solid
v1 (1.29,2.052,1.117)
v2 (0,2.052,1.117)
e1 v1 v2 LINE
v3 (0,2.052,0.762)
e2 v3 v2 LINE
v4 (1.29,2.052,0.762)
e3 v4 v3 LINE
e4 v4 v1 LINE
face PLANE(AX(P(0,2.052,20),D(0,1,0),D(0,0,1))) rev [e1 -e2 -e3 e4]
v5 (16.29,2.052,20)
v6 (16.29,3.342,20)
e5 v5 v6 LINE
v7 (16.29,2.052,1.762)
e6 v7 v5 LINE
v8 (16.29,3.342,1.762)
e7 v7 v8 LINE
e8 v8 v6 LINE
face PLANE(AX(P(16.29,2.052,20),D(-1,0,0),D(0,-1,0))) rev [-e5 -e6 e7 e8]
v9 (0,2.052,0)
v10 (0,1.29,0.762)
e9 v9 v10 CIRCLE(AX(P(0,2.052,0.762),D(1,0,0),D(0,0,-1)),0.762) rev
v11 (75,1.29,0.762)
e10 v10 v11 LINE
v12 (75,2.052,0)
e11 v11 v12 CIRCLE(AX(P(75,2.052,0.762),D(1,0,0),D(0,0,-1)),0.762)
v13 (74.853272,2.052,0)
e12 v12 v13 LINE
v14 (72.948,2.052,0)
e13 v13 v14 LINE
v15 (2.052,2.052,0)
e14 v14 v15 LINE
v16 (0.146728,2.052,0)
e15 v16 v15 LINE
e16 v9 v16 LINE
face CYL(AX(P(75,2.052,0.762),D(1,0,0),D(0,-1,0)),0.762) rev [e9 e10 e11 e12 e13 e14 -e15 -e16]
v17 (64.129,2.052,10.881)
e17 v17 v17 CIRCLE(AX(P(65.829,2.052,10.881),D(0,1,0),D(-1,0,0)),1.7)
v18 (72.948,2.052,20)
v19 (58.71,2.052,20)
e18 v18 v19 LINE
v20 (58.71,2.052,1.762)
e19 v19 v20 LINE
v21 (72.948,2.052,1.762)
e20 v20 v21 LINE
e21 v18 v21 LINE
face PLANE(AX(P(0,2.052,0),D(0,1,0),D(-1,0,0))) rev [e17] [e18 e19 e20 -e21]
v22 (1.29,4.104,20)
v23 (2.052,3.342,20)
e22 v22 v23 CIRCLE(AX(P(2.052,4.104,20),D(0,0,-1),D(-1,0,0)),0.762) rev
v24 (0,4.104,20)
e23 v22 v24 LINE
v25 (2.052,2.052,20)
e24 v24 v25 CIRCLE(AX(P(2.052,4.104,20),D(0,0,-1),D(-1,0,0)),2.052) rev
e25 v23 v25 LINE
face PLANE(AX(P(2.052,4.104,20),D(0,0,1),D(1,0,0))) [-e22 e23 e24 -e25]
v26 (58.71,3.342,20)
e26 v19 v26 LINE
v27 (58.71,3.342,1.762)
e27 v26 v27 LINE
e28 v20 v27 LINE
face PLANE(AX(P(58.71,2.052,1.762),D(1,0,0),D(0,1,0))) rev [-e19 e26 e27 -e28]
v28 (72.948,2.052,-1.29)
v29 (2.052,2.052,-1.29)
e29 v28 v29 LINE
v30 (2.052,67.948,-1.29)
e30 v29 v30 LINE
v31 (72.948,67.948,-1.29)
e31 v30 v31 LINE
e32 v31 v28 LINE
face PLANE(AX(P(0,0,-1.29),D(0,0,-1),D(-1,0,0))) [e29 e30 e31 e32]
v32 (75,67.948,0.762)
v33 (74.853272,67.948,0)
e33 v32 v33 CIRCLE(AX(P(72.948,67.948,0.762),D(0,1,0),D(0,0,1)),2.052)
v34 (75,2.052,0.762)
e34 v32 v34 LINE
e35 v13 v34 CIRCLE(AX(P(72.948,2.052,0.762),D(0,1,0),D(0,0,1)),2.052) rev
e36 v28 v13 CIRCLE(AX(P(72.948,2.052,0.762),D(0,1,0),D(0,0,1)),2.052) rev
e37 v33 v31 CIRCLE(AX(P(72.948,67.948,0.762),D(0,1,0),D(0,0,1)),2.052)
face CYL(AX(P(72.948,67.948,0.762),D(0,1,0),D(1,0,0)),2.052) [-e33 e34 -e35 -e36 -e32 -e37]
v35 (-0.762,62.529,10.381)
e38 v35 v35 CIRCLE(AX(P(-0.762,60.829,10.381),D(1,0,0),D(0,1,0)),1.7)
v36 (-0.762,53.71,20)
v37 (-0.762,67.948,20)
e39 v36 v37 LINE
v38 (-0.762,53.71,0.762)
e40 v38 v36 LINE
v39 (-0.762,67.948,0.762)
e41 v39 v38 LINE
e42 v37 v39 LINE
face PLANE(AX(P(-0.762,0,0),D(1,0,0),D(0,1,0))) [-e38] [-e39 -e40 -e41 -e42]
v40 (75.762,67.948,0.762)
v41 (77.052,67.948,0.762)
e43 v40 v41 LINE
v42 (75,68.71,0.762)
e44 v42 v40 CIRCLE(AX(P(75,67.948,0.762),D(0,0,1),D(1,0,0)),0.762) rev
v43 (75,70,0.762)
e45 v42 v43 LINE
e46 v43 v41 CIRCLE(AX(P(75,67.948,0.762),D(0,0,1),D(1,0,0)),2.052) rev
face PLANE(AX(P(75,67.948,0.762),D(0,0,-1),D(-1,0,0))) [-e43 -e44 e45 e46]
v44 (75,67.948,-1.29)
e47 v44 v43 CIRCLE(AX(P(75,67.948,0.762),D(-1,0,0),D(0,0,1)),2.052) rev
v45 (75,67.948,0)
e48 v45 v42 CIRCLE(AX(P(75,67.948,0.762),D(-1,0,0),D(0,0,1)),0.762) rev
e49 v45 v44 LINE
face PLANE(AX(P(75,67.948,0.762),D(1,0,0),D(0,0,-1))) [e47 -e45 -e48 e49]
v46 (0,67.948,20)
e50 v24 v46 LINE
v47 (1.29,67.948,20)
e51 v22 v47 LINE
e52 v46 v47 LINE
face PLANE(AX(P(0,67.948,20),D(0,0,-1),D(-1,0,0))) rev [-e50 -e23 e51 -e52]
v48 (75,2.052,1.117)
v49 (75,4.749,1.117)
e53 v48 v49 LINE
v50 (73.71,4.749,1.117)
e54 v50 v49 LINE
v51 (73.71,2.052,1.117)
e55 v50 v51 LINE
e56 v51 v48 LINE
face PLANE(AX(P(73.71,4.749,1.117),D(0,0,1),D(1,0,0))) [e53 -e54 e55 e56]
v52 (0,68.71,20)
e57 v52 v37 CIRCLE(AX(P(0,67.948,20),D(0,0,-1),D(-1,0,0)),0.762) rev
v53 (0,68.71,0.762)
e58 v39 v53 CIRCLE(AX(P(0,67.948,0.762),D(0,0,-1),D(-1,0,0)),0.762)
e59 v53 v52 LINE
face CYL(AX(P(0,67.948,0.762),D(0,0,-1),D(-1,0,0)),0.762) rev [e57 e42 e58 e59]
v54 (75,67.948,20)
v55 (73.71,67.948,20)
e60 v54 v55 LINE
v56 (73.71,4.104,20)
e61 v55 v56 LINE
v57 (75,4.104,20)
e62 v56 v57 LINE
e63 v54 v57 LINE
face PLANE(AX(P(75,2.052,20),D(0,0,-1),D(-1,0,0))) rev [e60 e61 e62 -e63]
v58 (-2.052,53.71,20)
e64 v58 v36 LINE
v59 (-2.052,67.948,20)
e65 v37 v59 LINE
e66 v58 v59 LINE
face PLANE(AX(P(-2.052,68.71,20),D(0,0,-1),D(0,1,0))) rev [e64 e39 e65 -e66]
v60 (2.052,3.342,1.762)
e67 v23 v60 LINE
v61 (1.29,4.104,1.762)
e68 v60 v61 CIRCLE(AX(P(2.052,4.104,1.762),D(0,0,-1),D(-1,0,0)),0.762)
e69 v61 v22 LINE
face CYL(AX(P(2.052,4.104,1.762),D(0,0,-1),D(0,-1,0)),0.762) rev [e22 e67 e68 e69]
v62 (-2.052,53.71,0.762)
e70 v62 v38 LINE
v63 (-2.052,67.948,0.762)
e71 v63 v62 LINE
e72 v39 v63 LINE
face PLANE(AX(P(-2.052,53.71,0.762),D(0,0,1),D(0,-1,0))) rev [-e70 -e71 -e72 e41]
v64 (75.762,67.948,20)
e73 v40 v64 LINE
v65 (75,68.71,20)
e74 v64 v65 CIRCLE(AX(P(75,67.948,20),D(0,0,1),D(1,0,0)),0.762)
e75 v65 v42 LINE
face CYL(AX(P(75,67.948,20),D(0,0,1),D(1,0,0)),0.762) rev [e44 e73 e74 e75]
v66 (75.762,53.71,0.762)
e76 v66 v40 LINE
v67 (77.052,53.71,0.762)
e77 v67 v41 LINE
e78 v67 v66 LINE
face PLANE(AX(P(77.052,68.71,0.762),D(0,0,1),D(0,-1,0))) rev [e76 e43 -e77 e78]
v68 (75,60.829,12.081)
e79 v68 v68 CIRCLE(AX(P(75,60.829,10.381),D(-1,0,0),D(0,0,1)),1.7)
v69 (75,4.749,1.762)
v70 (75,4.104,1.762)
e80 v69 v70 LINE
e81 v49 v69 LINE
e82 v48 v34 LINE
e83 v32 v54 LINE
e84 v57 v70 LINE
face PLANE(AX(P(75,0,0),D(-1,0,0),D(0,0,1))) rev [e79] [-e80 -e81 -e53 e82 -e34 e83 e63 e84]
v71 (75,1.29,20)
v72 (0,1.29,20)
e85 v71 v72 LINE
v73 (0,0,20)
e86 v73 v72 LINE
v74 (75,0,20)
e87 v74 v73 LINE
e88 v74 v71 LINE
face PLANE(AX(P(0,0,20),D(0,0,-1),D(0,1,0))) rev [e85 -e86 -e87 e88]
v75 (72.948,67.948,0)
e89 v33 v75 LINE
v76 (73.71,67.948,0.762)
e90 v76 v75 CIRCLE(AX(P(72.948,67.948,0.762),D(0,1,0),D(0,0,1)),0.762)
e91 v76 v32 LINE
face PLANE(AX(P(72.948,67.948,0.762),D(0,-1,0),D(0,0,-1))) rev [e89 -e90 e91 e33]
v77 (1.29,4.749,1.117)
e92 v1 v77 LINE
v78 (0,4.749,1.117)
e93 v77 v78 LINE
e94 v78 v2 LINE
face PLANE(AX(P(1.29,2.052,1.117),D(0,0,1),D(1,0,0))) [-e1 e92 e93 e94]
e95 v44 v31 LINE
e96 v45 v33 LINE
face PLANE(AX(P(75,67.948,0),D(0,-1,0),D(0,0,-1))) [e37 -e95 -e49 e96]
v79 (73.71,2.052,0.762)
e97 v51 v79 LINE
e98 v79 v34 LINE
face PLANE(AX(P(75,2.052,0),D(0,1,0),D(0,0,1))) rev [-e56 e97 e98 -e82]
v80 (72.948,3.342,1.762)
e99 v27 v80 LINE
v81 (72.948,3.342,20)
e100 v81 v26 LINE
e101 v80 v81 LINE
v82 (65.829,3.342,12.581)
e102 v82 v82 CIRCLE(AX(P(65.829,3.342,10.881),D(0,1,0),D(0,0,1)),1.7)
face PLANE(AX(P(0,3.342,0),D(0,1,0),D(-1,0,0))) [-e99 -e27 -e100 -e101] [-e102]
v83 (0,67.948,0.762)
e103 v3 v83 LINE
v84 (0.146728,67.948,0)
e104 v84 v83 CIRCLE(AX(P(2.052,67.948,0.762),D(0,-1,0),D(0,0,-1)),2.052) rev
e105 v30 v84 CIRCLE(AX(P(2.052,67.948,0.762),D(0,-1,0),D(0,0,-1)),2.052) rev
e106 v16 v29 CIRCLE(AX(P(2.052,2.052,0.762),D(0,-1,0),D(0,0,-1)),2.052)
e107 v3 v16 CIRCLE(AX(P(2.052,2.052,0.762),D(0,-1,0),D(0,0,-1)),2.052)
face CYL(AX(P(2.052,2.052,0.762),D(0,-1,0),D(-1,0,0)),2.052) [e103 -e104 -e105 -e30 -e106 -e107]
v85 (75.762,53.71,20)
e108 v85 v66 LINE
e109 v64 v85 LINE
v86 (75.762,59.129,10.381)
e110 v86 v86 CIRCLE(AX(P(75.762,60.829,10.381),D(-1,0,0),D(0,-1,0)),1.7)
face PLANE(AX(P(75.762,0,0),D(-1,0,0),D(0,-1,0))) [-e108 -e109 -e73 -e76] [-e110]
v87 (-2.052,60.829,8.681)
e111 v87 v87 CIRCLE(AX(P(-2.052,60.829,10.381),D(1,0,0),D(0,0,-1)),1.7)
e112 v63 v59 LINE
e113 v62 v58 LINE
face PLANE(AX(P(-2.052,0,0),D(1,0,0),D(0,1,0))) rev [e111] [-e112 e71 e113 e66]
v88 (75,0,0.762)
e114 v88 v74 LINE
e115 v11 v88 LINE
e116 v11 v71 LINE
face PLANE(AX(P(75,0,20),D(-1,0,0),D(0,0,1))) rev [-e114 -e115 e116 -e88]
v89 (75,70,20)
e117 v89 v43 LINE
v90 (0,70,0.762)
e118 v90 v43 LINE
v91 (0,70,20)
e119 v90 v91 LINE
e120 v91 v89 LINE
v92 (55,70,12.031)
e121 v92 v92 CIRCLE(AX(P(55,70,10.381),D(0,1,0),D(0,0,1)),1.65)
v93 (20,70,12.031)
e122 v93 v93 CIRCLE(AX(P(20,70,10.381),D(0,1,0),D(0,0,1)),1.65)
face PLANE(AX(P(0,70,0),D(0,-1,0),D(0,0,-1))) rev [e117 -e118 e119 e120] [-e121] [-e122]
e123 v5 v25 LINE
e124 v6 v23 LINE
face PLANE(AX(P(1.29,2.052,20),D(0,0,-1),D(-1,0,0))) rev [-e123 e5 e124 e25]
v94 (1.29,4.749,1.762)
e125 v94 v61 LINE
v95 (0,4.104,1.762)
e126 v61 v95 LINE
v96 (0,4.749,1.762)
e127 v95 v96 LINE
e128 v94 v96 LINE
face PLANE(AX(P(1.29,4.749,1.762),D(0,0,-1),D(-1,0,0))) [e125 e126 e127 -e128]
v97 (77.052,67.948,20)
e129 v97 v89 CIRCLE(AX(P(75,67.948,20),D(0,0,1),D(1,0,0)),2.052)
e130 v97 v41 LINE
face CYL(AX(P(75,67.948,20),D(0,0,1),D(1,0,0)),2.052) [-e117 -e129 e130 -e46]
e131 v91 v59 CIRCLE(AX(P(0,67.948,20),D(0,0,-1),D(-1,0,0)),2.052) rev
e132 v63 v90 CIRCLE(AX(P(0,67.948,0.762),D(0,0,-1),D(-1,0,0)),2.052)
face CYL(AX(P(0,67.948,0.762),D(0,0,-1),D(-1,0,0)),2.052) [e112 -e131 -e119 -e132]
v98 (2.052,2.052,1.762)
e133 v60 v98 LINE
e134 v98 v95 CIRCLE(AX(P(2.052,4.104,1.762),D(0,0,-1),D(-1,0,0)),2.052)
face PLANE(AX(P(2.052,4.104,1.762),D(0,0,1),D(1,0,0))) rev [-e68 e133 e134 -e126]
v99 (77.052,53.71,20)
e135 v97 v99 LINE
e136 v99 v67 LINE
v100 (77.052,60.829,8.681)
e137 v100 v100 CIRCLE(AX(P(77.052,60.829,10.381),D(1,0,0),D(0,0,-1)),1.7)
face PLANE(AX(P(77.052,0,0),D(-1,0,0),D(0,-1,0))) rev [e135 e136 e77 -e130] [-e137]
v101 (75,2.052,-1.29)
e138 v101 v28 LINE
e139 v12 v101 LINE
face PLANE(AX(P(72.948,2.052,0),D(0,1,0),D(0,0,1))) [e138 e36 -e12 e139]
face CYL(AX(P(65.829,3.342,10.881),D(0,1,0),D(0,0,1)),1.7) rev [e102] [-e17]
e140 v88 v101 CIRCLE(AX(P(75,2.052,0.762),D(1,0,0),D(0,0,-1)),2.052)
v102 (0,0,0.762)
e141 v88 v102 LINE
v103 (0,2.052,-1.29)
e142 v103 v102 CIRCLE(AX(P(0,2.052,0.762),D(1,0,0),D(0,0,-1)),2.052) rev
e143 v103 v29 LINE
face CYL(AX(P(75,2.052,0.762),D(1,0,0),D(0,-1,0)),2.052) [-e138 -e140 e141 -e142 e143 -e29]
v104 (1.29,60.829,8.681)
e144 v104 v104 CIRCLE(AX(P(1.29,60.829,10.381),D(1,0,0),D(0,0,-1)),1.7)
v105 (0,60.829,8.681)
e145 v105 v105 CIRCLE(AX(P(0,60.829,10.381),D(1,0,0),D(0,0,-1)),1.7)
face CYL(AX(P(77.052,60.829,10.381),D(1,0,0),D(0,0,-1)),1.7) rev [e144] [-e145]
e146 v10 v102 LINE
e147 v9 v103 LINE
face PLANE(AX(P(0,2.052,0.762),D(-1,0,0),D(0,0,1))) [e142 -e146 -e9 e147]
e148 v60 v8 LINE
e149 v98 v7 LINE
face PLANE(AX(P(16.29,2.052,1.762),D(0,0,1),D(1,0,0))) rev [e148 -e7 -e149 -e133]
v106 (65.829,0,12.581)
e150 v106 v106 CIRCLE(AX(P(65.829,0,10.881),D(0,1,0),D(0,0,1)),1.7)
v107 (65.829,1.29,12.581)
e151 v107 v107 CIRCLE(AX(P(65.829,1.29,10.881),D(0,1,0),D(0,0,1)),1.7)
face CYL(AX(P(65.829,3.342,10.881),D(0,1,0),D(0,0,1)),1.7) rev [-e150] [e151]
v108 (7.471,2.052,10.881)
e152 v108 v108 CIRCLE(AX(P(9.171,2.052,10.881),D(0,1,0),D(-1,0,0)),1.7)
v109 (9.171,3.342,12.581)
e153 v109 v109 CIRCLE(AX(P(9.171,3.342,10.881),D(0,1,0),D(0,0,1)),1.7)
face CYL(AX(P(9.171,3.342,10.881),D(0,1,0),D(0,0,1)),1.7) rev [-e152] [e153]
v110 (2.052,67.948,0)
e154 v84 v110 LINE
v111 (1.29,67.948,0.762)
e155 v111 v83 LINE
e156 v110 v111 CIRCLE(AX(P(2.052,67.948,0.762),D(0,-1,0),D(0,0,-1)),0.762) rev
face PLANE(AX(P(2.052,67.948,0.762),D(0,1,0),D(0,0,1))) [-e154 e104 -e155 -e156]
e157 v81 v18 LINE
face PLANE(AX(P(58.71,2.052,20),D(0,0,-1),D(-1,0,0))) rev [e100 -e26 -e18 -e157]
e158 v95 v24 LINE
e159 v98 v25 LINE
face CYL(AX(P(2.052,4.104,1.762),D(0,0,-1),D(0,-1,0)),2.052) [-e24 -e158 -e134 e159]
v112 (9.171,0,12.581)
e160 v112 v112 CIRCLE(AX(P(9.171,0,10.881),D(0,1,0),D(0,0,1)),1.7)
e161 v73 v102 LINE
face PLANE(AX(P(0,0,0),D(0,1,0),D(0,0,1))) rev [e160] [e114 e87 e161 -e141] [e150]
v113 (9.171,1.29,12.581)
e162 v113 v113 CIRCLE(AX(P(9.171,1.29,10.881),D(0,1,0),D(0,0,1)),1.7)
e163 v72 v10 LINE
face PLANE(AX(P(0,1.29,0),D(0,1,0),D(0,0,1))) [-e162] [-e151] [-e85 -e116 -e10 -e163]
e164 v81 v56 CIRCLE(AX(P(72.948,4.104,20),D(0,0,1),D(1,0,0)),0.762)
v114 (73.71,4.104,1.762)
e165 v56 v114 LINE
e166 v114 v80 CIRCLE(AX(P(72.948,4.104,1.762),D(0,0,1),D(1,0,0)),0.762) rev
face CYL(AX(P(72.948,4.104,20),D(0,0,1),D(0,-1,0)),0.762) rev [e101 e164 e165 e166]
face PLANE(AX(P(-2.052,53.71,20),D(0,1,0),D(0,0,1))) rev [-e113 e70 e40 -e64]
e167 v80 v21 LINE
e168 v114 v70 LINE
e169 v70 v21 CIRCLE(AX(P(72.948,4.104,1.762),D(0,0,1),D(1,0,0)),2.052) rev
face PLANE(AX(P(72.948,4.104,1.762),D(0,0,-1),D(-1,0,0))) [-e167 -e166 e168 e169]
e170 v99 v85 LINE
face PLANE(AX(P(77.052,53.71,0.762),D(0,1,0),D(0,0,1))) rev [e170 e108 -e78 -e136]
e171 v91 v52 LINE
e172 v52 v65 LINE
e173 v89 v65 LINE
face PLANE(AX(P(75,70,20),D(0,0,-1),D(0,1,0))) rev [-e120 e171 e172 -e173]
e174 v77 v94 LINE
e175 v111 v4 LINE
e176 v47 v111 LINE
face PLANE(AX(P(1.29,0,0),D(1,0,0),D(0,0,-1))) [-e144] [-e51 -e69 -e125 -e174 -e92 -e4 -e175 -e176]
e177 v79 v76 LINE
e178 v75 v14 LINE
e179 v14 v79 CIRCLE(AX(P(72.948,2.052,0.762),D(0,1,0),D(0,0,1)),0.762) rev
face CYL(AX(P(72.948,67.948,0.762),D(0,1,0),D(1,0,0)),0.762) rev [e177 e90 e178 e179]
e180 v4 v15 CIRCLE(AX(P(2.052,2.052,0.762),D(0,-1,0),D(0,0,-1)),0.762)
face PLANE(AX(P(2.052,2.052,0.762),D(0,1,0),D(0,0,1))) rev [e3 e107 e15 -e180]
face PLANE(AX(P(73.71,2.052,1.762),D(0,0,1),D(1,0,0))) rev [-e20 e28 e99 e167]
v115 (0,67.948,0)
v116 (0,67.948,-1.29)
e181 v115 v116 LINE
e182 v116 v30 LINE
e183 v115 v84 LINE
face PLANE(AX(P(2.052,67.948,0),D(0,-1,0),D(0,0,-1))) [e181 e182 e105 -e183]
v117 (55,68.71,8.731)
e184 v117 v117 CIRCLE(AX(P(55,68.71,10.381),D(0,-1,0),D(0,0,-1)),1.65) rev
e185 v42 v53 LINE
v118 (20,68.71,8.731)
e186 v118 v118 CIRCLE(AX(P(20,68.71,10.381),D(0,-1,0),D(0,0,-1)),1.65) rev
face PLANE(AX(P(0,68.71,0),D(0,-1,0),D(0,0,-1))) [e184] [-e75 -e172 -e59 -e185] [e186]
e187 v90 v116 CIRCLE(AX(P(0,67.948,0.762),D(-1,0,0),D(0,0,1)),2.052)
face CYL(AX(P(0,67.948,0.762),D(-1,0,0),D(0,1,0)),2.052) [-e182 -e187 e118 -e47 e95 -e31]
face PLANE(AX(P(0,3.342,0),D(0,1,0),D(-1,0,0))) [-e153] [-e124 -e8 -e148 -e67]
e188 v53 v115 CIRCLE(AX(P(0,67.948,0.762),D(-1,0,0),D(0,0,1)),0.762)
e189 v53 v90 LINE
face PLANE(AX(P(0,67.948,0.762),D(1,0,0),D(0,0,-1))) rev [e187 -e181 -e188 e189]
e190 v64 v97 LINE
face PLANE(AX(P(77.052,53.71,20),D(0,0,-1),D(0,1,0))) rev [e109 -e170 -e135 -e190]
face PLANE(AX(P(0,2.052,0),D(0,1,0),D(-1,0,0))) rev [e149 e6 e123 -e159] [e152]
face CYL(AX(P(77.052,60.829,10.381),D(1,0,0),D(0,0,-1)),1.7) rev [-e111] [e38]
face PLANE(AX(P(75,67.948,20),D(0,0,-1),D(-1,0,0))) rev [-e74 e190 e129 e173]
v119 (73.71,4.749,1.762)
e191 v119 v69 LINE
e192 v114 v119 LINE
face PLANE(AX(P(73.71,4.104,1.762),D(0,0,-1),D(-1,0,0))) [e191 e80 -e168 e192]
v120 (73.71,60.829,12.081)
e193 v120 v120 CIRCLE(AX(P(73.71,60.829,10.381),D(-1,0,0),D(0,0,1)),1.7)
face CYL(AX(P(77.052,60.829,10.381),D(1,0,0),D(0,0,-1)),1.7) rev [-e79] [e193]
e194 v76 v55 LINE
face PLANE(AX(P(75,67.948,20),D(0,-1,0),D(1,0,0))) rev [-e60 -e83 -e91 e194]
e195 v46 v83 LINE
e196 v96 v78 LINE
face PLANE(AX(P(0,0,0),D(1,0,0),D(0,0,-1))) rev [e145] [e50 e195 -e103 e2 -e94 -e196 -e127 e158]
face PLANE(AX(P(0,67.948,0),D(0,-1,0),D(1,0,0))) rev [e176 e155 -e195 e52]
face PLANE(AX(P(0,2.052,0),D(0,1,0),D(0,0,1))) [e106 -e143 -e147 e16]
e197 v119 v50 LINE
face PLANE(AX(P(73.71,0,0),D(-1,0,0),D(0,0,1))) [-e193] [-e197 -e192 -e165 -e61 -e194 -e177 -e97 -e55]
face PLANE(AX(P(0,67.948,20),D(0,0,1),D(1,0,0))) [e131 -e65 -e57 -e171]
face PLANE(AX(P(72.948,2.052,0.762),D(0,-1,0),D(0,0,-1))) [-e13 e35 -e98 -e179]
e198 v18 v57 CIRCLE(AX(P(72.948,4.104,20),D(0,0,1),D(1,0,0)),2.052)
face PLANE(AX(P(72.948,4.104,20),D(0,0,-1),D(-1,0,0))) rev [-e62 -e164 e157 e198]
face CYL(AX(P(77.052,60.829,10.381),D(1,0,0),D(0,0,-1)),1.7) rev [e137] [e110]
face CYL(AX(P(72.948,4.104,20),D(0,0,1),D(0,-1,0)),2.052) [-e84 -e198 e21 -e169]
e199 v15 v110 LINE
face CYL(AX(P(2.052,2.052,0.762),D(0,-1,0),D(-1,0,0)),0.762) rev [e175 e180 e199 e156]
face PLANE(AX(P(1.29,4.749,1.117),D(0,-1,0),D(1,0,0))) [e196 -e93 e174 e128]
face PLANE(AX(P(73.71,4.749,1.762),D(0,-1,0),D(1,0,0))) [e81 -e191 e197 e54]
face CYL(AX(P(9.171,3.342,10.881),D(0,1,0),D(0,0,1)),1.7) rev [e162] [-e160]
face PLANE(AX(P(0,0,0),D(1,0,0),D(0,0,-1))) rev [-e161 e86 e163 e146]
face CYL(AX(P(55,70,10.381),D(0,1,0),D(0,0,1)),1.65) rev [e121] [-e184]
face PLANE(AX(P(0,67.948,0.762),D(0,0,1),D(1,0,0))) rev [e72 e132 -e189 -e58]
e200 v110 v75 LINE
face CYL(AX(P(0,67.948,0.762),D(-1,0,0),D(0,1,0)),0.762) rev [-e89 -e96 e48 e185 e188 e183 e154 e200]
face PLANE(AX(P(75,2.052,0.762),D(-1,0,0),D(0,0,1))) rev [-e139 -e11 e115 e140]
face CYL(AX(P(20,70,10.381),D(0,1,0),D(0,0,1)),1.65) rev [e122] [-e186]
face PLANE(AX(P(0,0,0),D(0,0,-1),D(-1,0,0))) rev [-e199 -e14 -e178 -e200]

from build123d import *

# Parameters (mm, degrees)
SKETCH1_W                        = 75
SKETCH1_H                        = 70
BASE_FLANGE1_DEPTH               = 1.29
EDGE_FLANGE1_STRIP_W             = 6.684
EDGE_FLANGE1_STRIP_H             = 1.29
EDGE_FLANGE1_STRIP_CUT_DEPTH     = 75
EDGE_FLANGE1_DEPTH               = 75
EDGE_FLANGE2_STRIP_W             = 6.684
EDGE_FLANGE2_STRIP_H             = 1.29
EDGE_FLANGE2_STRIP_CUT_DEPTH     = 75
EDGE_FLANGE2_DEPTH               = 75
EDGE_FLANGE3_STRIP_W             = 6.684
EDGE_FLANGE3_STRIP_H             = 1.29
EDGE_FLANGE3_STRIP_CUT_DEPTH     = 65.896
EDGE_FLANGE3_DEPTH               = 65.896
EDGE_FLANGE4_STRIP_W             = 6.684
EDGE_FLANGE4_STRIP_H             = 1.29
EDGE_FLANGE4_STRIP_CUT_DEPTH     = 65.896
EDGE_FLANGE4_DEPTH               = 65.896
EDGE_FLANGE6_START               = 1.117
EDGE_FLANGE6_DEPTH               = 18.883
EDGE_FLANGE6_2_DEPTH             = 0.645
EDGE_FLANGE6_START_2             = 1.762
EDGE_FLANGE6_3_DEPTH             = 18.238
EDGE_FLANGE8_START               = 1.117
EDGE_FLANGE8_DEPTH               = 18.883
EDGE_FLANGE8_2_DEPTH             = 0.645
EDGE_FLANGE8_START_2             = 1.762
EDGE_FLANGE8_3_DEPTH             = 18.238
EDGE_FLANGE9_DEPTH               = 19.238
EDGE_FLANGE10_DEPTH              = 19.238
TAP_DRILL_FOR_M4X0_7_TAP1_REACH  = 108.005
TAP_DRILL_FOR_M4X0_7_TAP1_BORE_R = 1.65
M3_CLEARANCE_HOLE1_D             = 3.4
M3_CLEARANCE_HOLE1_DEPTH         = 3.342
M3_CLEARANCE_HOLE2_D             = 3.4


# Read off the part's stored shape, not the designer's step: Edge-Flange6, Edge-Flange8
# Sheet-metal steps are written as plain solids
with BuildPart() as part:
    # Sketch1 → Base-Flange1 (new body)
    with BuildSketch(Plane.XY):
        with Locations((37.5, 35)):
            Rectangle(SKETCH1_W, SKETCH1_H)
    extrude(amount=-BASE_FLANGE1_DEPTH)

    # Edge-Flange1 strip (across the edge) → Edge-Flange1 strip cut (cut)
    with BuildSketch(Plane(origin=(75, 70, 0), x_dir=(0, -1, 0), z_dir=(-1, 0, 0))):
        with Locations((-1.29, -0.645)):
            Rectangle(EDGE_FLANGE1_STRIP_W, EDGE_FLANGE1_STRIP_H)
    extrude(amount=EDGE_FLANGE1_STRIP_CUT_DEPTH, mode=Mode.SUBTRACT)

    # Edge-Flange1 section (across the edge) → Edge-Flange1 (add)
    with BuildSketch(Plane(origin=(75, 70, 0), x_dir=(0, -1, 0), z_dir=(-1, 0, 0))):
        with BuildLine():
            Line((0, 0.762), (0, 20))
            Line((0, 20), (1.29, 20))
            Line((1.29, 20), (1.29, 0.762))
            ThreePointArc((1.29, 0.762), (1.513184633, 0.223184633), (2.052, 0))
            Line((2.052, 0), (2.052, -1.29))
            ThreePointArc((2.052, -1.29), (0.601016885, -0.688983115), (0, 0.762))
        make_face()
    extrude(amount=EDGE_FLANGE1_DEPTH)

    # Edge-Flange2 strip (across the edge) → Edge-Flange2 strip cut (cut)
    with BuildSketch(Plane.YZ):
        with Locations((-1.29, -0.645)):
            Rectangle(EDGE_FLANGE2_STRIP_W, EDGE_FLANGE2_STRIP_H)
    extrude(amount=EDGE_FLANGE2_STRIP_CUT_DEPTH, mode=Mode.SUBTRACT)

    # Edge-Flange2 section (across the edge) → Edge-Flange2 (add)
    with BuildSketch(Plane.YZ):
        with BuildLine():
            Line((0, 0.762), (0, 20))
            Line((0, 20), (1.29, 20))
            Line((1.29, 20), (1.29, 0.762))
            ThreePointArc((1.29, 0.762), (1.513184633, 0.223184633), (2.052, 0))
            Line((2.052, 0), (2.052, -1.29))
            ThreePointArc((2.052, -1.29), (0.601016885, -0.688983115), (0, 0.762))
        make_face()
    extrude(amount=EDGE_FLANGE2_DEPTH)

    # Edge-Flange3 strip (across the edge) → Edge-Flange3 strip cut (cut)
    with BuildSketch(Plane.XZ.offset(-67.948)):
        with Locations((-1.29, -0.645)):
            Rectangle(EDGE_FLANGE3_STRIP_W, EDGE_FLANGE3_STRIP_H)
    extrude(amount=EDGE_FLANGE3_STRIP_CUT_DEPTH, mode=Mode.SUBTRACT)

    # Edge-Flange3 section (across the edge) → Edge-Flange3 (add)
    with BuildSketch(Plane.XZ.offset(-67.948)):
        with BuildLine():
            Line((0, 0.762), (0, 20))
            Line((0, 20), (1.29, 20))
            Line((1.29, 20), (1.29, 0.762))
            ThreePointArc((1.29, 0.762), (1.513184633, 0.223184633), (2.052, 0))
            Line((2.052, 0), (2.052, -1.29))
            ThreePointArc((2.052, -1.29), (0.601016885, -0.688983115), (0, 0.762))
        make_face()
    extrude(amount=EDGE_FLANGE3_DEPTH)

    # Edge-Flange4 strip (across the edge) → Edge-Flange4 strip cut (cut)
    with BuildSketch(Plane(origin=(75, 2.052, 0), x_dir=(-1, 0, 0), z_dir=(0, 1, 0))):
        with Locations((-1.29, -0.645)):
            Rectangle(EDGE_FLANGE4_STRIP_W, EDGE_FLANGE4_STRIP_H)
    extrude(amount=EDGE_FLANGE4_STRIP_CUT_DEPTH, mode=Mode.SUBTRACT)

    # Edge-Flange4 section (across the edge) → Edge-Flange4 (add)
    with BuildSketch(Plane(origin=(75, 2.052, 0), x_dir=(-1, 0, 0), z_dir=(0, 1, 0))):
        with BuildLine():
            Line((0, 0.762), (0, 20))
            Line((0, 20), (1.29, 20))
            Line((1.29, 20), (1.29, 0.762))
            ThreePointArc((1.29, 0.762), (1.513184633, 0.223184633), (2.052, 0))
            Line((2.052, 0), (2.052, -1.29))
            ThreePointArc((2.052, -1.29), (0.601016885, -0.688983115), (0, 0.762))
        make_face()
    extrude(amount=EDGE_FLANGE4_DEPTH)

    # Edge-Flange6 outline → Edge-Flange6 (cut)
    with BuildSketch(Plane.XY.offset(EDGE_FLANGE6_START)):
        with BuildLine():
            Line((1.29, 2.052), (1.29, 2.198728366))
            ThreePointArc((1.29, 2.198728366), (0.352834322, 2.953547915), (0, 4.104))
            Line((0, 4.104), (0, 2.052))
            Line((0, 2.052), (1.29, 2.052))
        make_face()
    extrude(amount=EDGE_FLANGE6_DEPTH, mode=Mode.SUBTRACT)

    # Edge-Flange6 2 outline → Edge-Flange6 2 (cut)
    with BuildSketch(Plane.XY.offset(EDGE_FLANGE6_START)):
        with BuildLine():
            ThreePointArc((0, 4.104), (0.352834322, 2.953547915), (1.29, 2.198728366))
            Line((1.29, 2.198728366), (1.29, 4.749))
            Line((1.29, 4.749), (0, 4.749))
            Line((0, 4.749), (0, 4.104))
        make_face()
    extrude(amount=EDGE_FLANGE6_2_DEPTH, mode=Mode.SUBTRACT)

    # Edge-Flange6 3 outline → Edge-Flange6 3 (add)
    with BuildSketch(Plane.XY.offset(EDGE_FLANGE6_START_2)):
        with BuildLine():
            Line((2.052, 2.052), (16.29, 2.052))
            Line((16.29, 2.052), (16.29, 3.342))
            Line((16.29, 3.342), (2.052, 3.342))
            ThreePointArc((2.052, 3.342), (1.513184633, 3.565184633), (1.29, 4.104))
            Line((1.29, 4.104), (1.29, 2.198728366))
            ThreePointArc((1.29, 2.198728366), (1.664000898, 2.089015956), (2.052, 2.052))
        make_face()
    extrude(amount=EDGE_FLANGE6_3_DEPTH)

    # Edge-Flange8 outline → Edge-Flange8 (cut)
    with BuildSketch(Plane.XY.offset(EDGE_FLANGE8_START)):
        with BuildLine():
            ThreePointArc((75, 4.104), (74.647165678, 2.953547915), (73.71, 2.198728366))
            Line((73.71, 2.198728366), (73.71, 2.052))
            Line((73.71, 2.052), (75, 2.052))
            Line((75, 2.052), (75, 4.104))
        make_face()
    extrude(amount=EDGE_FLANGE8_DEPTH, mode=Mode.SUBTRACT)

    # Edge-Flange8 2 outline → Edge-Flange8 2 (cut)
    with BuildSketch(Plane.XY.offset(EDGE_FLANGE8_START)):
        with BuildLine():
            Line((73.71, 4.749), (73.71, 2.198728366))
            ThreePointArc((73.71, 2.198728366), (74.647165678, 2.953547915), (75, 4.104))
            Line((75, 4.104), (75, 4.749))
            Line((75, 4.749), (73.71, 4.749))
        make_face()
    extrude(amount=EDGE_FLANGE8_2_DEPTH, mode=Mode.SUBTRACT)

    # Edge-Flange8 3 outline → Edge-Flange8 3 (add)
    with BuildSketch(Plane.XY.offset(EDGE_FLANGE8_START_2)):
        with BuildLine():
            Line((58.71, 2.052), (72.948, 2.052))
            ThreePointArc((72.948, 2.052), (73.335999102, 2.089015956), (73.71, 2.198728366))
            Line((73.71, 2.198728366), (73.71, 4.104))
            ThreePointArc((73.71, 4.104), (73.486815367, 3.565184633), (72.948, 3.342))
            Line((72.948, 3.342), (58.71, 3.342))
            Line((58.71, 3.342), (58.71, 2.052))
        make_face()
    extrude(amount=EDGE_FLANGE8_3_DEPTH)

    # Edge-Flange9 section (across the edge) → Edge-Flange9 (add)
    with BuildSketch(Plane(origin=(75.762, 68.71, 0.762), x_dir=(-1, 0, 0), z_dir=(0, 0, 1))):
        with BuildLine():
            Line((-1.29, 0.762), (-1.29, 15))
            Line((-1.29, 15), (0, 15))
            Line((0, 15), (0, 0.762))
            ThreePointArc((0, 0.762), (0.223184633, 0.223184633), (0.762, 0))
            Line((0.762, 0), (0.762, -1.29))
            ThreePointArc((0.762, -1.29), (-0.688983115, -0.688983115), (-1.29, 0.762))
        make_face()
    extrude(amount=EDGE_FLANGE9_DEPTH)

    # Edge-Flange10 section (across the edge) → Edge-Flange10 (add)
    with BuildSketch(Plane(origin=(-0.762, 68.71, 20), x_dir=(1, 0, 0), z_dir=(0, 0, -1))):
        with BuildLine():
            Line((-1.29, 0.762), (-1.29, 15))
            Line((-1.29, 15), (0, 15))
            Line((0, 15), (0, 0.762))
            ThreePointArc((0, 0.762), (0.223184633, 0.223184633), (0.762, 0))
            Line((0.762, 0), (0.762, -1.29))
            ThreePointArc((0.762, -1.29), (-0.688983115, -0.688983115), (-1.29, 0.762))
        make_face()
    extrude(amount=EDGE_FLANGE10_DEPTH)

    # Tap Drill for M4x0.7 Tap1 bore → Tap Drill for M4x0.7 Tap1 (cut, up to next)
    with BuildSketch(Plane(origin=(0, 70, 0), x_dir=(1, 0, 0), z_dir=(0, 1, 0)), mode=Mode.PRIVATE) as tap_drill_for_m4x0_7_tap1_sk1:
        with Locations((55, -10.381)):
            Circle(TAP_DRILL_FOR_M4X0_7_TAP1_BORE_R)
    tap_drill_for_m4x0_7_tap1_tool1 = extrude(tap_drill_for_m4x0_7_tap1_sk1.sketch, amount=-TAP_DRILL_FOR_M4X0_7_TAP1_REACH, mode=Mode.PRIVATE) & part.part
    # Tap Drill for M4x0.7 Tap1 bore → Tap Drill for M4x0.7 Tap1 (cut, up to next)
    with BuildSketch(Plane(origin=(0, 70, 0), x_dir=(1, 0, 0), z_dir=(0, 1, 0)), mode=Mode.PRIVATE) as tap_drill_for_m4x0_7_tap1_sk2:
        with Locations((20, -10.381)):
            Circle(TAP_DRILL_FOR_M4X0_7_TAP1_BORE_R)
    tap_drill_for_m4x0_7_tap1_tool2 = extrude(tap_drill_for_m4x0_7_tap1_sk2.sketch, amount=-TAP_DRILL_FOR_M4X0_7_TAP1_REACH, mode=Mode.PRIVATE) & part.part
    add(tap_drill_for_m4x0_7_tap1_tool1.solids().sort_by_distance((55, 70, 10.381))[0], mode=Mode.SUBTRACT)
    add(tap_drill_for_m4x0_7_tap1_tool2.solids().sort_by_distance((20, 70, 10.381))[0], mode=Mode.SUBTRACT)

    # M3 Clearance Hole1
    with Locations(Plane(origin=(0, 3.342, 0), x_dir=(1, 0, 0), z_dir=(0, 1, 0))):
        with Locations((9.171, -10.881), (65.829, -10.881)):
            Hole(M3_CLEARANCE_HOLE1_D / 2, depth=M3_CLEARANCE_HOLE1_DEPTH)

    # M3 Clearance Hole2 (through all)
    with Locations(Plane(origin=(77.052, 0, 0), x_dir=(0, 0, -1), z_dir=(1, 0, 0))):
        with Locations((-10.381, 60.829)):
            Hole(M3_CLEARANCE_HOLE2_D / 2)


solid = part.part
